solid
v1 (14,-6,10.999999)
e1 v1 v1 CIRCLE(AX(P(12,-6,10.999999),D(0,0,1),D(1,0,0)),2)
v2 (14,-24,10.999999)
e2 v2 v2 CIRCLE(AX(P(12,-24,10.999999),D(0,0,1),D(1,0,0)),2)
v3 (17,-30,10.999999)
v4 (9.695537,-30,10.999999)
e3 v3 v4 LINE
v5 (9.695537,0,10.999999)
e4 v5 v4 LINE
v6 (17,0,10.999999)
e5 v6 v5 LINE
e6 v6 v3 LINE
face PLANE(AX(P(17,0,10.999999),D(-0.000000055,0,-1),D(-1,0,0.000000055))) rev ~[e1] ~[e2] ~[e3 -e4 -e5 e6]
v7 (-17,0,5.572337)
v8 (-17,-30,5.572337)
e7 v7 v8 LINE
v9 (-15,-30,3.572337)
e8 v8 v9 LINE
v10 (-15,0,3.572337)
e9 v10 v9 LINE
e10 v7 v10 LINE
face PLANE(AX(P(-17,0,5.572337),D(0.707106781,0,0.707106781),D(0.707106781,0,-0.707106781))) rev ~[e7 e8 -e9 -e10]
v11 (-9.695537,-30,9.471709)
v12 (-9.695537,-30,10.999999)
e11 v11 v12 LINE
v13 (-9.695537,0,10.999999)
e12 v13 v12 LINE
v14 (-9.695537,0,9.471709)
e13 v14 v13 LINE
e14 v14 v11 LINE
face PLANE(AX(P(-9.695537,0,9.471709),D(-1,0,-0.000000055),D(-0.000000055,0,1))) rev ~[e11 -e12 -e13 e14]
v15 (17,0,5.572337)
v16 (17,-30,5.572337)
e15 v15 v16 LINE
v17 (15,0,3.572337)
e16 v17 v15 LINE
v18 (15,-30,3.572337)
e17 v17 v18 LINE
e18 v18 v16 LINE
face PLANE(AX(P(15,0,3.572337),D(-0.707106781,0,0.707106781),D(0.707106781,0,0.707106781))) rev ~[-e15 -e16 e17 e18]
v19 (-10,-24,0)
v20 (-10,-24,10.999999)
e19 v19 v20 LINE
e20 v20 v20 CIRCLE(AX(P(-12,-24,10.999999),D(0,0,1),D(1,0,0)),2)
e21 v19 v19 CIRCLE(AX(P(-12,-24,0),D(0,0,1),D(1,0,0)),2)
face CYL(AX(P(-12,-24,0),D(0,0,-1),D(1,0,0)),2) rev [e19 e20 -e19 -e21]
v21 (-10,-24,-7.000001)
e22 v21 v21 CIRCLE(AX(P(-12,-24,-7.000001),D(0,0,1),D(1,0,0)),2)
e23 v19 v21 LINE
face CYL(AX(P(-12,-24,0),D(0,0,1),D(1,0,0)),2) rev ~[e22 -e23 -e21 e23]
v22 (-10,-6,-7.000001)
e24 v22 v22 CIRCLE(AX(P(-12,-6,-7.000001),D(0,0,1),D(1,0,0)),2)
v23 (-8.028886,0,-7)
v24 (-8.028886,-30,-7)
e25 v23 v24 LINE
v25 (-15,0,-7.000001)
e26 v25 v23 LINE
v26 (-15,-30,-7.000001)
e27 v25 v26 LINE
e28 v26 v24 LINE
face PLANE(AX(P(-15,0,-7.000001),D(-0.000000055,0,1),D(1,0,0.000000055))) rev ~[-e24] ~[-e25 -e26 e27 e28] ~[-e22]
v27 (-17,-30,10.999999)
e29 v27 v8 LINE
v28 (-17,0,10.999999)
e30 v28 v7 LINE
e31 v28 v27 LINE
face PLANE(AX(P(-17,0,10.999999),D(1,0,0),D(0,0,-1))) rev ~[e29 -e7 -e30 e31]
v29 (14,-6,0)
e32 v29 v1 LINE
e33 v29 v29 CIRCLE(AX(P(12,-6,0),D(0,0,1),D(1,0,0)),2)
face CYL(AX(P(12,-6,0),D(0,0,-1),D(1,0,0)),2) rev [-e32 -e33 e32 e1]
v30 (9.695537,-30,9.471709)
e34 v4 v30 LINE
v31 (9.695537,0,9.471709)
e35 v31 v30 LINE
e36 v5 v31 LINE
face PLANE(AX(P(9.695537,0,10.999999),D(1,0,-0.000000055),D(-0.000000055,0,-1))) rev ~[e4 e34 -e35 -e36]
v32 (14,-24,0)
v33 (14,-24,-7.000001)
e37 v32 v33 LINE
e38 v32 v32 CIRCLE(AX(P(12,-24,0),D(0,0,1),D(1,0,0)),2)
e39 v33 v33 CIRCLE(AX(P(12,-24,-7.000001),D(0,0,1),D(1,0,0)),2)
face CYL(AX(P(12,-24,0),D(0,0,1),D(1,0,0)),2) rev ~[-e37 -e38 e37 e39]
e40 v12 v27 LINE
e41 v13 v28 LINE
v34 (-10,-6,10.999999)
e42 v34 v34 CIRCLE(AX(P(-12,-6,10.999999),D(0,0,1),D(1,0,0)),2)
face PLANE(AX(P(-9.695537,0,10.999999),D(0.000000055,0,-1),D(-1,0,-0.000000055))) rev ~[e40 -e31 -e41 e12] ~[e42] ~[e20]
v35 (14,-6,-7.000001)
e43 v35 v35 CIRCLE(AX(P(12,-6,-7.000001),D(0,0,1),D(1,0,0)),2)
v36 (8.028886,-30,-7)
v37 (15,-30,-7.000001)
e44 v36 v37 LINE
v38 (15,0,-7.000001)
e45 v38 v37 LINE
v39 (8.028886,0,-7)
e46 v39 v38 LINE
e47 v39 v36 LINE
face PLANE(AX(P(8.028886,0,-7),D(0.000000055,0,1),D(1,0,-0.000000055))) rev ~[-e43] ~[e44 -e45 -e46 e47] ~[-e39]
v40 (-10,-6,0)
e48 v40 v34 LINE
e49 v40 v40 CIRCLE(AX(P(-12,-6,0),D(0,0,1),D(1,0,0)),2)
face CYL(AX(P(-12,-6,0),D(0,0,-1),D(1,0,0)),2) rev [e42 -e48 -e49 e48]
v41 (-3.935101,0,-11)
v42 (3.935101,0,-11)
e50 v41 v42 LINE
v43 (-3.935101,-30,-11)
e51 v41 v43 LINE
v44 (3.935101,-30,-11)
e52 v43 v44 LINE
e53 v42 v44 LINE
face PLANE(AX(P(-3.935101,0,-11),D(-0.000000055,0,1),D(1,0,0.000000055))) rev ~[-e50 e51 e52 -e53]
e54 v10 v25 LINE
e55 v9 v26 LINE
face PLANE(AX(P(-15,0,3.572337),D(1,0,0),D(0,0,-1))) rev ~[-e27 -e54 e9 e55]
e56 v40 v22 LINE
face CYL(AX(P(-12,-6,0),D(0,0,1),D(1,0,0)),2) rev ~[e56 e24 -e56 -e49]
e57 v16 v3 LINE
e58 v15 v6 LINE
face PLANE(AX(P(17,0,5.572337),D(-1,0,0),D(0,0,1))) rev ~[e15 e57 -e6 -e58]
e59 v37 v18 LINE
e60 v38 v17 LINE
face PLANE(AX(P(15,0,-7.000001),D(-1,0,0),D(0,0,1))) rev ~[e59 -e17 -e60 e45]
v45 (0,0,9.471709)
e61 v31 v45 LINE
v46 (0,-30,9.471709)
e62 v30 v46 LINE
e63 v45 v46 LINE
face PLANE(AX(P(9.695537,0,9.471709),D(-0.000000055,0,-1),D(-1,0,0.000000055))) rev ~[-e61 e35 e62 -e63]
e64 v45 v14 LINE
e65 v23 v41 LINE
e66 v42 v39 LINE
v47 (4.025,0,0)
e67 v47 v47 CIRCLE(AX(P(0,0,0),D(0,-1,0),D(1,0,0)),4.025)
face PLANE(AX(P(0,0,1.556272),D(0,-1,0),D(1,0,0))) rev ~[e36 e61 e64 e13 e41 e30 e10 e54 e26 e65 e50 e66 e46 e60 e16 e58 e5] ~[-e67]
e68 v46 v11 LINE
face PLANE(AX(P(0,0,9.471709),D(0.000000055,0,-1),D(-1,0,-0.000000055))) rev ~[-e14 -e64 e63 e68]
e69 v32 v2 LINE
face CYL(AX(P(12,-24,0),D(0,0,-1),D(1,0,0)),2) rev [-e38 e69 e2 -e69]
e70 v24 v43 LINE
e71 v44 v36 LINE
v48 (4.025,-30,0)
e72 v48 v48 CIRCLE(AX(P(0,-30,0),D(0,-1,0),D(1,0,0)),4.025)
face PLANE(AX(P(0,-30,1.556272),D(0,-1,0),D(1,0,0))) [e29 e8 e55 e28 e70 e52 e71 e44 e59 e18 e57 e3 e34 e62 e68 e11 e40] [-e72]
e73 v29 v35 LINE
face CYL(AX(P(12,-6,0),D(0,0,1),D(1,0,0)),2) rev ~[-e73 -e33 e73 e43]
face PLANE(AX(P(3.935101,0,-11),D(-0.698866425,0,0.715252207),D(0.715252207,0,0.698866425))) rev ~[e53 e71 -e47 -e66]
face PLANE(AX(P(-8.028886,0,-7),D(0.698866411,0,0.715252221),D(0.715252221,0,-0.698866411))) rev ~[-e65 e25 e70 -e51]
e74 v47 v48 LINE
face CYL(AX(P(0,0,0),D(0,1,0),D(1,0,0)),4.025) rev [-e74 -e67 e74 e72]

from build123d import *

# Parameters (mm, degrees)
F0_R          = 4.025
F1_DEPTH      = 30
F2_R          = 2
F3_DEPTH      = 10.9999993406
F3_DEPTH_BACK = 25


# Not quite as in the source:
# - ends of sketch curves that miss each other by under 0.0002 mm in the source are joined


with BuildPart() as f1:
    # F0 (on Front) → F1 (new body)
    with BuildSketch(Plane.XZ):
        Polygon((-17, 10.9999990659), (-17, 5.5723366328), (-15, 3.5723366328), (-15, -7.0000008242), (-8.0288857139, -7.0000004412), (-3.9351008678, -11.0000002162), (3.022e-07, -11), (3.9351014722, -10.9999997838), (8.0288857139, -7.0000004412), (15, -7.0000008242), (15, 3.5723366328), (17, 5.5723366328), (17, 10.9999990659), (9.6955373869, 10.9999994673), (9.6955373029, 9.4717088947), (8.4e-08, 9.4717094274), (-9.6955373029, 9.4717088947), (-9.6955373869, 10.9999994673), align=None)
        Circle(F0_R, mode=Mode.SUBTRACT)
    extrude(amount=F1_DEPTH)

    # F2 (on Top) → F3 (cut, two sides)
    with BuildSketch(Plane.XY) as f3_sk:
        with Locations((-12, -6)):
            Circle(F2_R)
        with Locations((-12, -24)):
            Circle(F2_R)
        with Locations((12, -6)):
            Circle(F2_R)
        with Locations((12, -24)):
            Circle(F2_R)
    extrude(amount=F3_DEPTH, mode=Mode.SUBTRACT)
    extrude(f3_sk.sketch, amount=-F3_DEPTH_BACK, mode=Mode.SUBTRACT)


solid = f1.part
